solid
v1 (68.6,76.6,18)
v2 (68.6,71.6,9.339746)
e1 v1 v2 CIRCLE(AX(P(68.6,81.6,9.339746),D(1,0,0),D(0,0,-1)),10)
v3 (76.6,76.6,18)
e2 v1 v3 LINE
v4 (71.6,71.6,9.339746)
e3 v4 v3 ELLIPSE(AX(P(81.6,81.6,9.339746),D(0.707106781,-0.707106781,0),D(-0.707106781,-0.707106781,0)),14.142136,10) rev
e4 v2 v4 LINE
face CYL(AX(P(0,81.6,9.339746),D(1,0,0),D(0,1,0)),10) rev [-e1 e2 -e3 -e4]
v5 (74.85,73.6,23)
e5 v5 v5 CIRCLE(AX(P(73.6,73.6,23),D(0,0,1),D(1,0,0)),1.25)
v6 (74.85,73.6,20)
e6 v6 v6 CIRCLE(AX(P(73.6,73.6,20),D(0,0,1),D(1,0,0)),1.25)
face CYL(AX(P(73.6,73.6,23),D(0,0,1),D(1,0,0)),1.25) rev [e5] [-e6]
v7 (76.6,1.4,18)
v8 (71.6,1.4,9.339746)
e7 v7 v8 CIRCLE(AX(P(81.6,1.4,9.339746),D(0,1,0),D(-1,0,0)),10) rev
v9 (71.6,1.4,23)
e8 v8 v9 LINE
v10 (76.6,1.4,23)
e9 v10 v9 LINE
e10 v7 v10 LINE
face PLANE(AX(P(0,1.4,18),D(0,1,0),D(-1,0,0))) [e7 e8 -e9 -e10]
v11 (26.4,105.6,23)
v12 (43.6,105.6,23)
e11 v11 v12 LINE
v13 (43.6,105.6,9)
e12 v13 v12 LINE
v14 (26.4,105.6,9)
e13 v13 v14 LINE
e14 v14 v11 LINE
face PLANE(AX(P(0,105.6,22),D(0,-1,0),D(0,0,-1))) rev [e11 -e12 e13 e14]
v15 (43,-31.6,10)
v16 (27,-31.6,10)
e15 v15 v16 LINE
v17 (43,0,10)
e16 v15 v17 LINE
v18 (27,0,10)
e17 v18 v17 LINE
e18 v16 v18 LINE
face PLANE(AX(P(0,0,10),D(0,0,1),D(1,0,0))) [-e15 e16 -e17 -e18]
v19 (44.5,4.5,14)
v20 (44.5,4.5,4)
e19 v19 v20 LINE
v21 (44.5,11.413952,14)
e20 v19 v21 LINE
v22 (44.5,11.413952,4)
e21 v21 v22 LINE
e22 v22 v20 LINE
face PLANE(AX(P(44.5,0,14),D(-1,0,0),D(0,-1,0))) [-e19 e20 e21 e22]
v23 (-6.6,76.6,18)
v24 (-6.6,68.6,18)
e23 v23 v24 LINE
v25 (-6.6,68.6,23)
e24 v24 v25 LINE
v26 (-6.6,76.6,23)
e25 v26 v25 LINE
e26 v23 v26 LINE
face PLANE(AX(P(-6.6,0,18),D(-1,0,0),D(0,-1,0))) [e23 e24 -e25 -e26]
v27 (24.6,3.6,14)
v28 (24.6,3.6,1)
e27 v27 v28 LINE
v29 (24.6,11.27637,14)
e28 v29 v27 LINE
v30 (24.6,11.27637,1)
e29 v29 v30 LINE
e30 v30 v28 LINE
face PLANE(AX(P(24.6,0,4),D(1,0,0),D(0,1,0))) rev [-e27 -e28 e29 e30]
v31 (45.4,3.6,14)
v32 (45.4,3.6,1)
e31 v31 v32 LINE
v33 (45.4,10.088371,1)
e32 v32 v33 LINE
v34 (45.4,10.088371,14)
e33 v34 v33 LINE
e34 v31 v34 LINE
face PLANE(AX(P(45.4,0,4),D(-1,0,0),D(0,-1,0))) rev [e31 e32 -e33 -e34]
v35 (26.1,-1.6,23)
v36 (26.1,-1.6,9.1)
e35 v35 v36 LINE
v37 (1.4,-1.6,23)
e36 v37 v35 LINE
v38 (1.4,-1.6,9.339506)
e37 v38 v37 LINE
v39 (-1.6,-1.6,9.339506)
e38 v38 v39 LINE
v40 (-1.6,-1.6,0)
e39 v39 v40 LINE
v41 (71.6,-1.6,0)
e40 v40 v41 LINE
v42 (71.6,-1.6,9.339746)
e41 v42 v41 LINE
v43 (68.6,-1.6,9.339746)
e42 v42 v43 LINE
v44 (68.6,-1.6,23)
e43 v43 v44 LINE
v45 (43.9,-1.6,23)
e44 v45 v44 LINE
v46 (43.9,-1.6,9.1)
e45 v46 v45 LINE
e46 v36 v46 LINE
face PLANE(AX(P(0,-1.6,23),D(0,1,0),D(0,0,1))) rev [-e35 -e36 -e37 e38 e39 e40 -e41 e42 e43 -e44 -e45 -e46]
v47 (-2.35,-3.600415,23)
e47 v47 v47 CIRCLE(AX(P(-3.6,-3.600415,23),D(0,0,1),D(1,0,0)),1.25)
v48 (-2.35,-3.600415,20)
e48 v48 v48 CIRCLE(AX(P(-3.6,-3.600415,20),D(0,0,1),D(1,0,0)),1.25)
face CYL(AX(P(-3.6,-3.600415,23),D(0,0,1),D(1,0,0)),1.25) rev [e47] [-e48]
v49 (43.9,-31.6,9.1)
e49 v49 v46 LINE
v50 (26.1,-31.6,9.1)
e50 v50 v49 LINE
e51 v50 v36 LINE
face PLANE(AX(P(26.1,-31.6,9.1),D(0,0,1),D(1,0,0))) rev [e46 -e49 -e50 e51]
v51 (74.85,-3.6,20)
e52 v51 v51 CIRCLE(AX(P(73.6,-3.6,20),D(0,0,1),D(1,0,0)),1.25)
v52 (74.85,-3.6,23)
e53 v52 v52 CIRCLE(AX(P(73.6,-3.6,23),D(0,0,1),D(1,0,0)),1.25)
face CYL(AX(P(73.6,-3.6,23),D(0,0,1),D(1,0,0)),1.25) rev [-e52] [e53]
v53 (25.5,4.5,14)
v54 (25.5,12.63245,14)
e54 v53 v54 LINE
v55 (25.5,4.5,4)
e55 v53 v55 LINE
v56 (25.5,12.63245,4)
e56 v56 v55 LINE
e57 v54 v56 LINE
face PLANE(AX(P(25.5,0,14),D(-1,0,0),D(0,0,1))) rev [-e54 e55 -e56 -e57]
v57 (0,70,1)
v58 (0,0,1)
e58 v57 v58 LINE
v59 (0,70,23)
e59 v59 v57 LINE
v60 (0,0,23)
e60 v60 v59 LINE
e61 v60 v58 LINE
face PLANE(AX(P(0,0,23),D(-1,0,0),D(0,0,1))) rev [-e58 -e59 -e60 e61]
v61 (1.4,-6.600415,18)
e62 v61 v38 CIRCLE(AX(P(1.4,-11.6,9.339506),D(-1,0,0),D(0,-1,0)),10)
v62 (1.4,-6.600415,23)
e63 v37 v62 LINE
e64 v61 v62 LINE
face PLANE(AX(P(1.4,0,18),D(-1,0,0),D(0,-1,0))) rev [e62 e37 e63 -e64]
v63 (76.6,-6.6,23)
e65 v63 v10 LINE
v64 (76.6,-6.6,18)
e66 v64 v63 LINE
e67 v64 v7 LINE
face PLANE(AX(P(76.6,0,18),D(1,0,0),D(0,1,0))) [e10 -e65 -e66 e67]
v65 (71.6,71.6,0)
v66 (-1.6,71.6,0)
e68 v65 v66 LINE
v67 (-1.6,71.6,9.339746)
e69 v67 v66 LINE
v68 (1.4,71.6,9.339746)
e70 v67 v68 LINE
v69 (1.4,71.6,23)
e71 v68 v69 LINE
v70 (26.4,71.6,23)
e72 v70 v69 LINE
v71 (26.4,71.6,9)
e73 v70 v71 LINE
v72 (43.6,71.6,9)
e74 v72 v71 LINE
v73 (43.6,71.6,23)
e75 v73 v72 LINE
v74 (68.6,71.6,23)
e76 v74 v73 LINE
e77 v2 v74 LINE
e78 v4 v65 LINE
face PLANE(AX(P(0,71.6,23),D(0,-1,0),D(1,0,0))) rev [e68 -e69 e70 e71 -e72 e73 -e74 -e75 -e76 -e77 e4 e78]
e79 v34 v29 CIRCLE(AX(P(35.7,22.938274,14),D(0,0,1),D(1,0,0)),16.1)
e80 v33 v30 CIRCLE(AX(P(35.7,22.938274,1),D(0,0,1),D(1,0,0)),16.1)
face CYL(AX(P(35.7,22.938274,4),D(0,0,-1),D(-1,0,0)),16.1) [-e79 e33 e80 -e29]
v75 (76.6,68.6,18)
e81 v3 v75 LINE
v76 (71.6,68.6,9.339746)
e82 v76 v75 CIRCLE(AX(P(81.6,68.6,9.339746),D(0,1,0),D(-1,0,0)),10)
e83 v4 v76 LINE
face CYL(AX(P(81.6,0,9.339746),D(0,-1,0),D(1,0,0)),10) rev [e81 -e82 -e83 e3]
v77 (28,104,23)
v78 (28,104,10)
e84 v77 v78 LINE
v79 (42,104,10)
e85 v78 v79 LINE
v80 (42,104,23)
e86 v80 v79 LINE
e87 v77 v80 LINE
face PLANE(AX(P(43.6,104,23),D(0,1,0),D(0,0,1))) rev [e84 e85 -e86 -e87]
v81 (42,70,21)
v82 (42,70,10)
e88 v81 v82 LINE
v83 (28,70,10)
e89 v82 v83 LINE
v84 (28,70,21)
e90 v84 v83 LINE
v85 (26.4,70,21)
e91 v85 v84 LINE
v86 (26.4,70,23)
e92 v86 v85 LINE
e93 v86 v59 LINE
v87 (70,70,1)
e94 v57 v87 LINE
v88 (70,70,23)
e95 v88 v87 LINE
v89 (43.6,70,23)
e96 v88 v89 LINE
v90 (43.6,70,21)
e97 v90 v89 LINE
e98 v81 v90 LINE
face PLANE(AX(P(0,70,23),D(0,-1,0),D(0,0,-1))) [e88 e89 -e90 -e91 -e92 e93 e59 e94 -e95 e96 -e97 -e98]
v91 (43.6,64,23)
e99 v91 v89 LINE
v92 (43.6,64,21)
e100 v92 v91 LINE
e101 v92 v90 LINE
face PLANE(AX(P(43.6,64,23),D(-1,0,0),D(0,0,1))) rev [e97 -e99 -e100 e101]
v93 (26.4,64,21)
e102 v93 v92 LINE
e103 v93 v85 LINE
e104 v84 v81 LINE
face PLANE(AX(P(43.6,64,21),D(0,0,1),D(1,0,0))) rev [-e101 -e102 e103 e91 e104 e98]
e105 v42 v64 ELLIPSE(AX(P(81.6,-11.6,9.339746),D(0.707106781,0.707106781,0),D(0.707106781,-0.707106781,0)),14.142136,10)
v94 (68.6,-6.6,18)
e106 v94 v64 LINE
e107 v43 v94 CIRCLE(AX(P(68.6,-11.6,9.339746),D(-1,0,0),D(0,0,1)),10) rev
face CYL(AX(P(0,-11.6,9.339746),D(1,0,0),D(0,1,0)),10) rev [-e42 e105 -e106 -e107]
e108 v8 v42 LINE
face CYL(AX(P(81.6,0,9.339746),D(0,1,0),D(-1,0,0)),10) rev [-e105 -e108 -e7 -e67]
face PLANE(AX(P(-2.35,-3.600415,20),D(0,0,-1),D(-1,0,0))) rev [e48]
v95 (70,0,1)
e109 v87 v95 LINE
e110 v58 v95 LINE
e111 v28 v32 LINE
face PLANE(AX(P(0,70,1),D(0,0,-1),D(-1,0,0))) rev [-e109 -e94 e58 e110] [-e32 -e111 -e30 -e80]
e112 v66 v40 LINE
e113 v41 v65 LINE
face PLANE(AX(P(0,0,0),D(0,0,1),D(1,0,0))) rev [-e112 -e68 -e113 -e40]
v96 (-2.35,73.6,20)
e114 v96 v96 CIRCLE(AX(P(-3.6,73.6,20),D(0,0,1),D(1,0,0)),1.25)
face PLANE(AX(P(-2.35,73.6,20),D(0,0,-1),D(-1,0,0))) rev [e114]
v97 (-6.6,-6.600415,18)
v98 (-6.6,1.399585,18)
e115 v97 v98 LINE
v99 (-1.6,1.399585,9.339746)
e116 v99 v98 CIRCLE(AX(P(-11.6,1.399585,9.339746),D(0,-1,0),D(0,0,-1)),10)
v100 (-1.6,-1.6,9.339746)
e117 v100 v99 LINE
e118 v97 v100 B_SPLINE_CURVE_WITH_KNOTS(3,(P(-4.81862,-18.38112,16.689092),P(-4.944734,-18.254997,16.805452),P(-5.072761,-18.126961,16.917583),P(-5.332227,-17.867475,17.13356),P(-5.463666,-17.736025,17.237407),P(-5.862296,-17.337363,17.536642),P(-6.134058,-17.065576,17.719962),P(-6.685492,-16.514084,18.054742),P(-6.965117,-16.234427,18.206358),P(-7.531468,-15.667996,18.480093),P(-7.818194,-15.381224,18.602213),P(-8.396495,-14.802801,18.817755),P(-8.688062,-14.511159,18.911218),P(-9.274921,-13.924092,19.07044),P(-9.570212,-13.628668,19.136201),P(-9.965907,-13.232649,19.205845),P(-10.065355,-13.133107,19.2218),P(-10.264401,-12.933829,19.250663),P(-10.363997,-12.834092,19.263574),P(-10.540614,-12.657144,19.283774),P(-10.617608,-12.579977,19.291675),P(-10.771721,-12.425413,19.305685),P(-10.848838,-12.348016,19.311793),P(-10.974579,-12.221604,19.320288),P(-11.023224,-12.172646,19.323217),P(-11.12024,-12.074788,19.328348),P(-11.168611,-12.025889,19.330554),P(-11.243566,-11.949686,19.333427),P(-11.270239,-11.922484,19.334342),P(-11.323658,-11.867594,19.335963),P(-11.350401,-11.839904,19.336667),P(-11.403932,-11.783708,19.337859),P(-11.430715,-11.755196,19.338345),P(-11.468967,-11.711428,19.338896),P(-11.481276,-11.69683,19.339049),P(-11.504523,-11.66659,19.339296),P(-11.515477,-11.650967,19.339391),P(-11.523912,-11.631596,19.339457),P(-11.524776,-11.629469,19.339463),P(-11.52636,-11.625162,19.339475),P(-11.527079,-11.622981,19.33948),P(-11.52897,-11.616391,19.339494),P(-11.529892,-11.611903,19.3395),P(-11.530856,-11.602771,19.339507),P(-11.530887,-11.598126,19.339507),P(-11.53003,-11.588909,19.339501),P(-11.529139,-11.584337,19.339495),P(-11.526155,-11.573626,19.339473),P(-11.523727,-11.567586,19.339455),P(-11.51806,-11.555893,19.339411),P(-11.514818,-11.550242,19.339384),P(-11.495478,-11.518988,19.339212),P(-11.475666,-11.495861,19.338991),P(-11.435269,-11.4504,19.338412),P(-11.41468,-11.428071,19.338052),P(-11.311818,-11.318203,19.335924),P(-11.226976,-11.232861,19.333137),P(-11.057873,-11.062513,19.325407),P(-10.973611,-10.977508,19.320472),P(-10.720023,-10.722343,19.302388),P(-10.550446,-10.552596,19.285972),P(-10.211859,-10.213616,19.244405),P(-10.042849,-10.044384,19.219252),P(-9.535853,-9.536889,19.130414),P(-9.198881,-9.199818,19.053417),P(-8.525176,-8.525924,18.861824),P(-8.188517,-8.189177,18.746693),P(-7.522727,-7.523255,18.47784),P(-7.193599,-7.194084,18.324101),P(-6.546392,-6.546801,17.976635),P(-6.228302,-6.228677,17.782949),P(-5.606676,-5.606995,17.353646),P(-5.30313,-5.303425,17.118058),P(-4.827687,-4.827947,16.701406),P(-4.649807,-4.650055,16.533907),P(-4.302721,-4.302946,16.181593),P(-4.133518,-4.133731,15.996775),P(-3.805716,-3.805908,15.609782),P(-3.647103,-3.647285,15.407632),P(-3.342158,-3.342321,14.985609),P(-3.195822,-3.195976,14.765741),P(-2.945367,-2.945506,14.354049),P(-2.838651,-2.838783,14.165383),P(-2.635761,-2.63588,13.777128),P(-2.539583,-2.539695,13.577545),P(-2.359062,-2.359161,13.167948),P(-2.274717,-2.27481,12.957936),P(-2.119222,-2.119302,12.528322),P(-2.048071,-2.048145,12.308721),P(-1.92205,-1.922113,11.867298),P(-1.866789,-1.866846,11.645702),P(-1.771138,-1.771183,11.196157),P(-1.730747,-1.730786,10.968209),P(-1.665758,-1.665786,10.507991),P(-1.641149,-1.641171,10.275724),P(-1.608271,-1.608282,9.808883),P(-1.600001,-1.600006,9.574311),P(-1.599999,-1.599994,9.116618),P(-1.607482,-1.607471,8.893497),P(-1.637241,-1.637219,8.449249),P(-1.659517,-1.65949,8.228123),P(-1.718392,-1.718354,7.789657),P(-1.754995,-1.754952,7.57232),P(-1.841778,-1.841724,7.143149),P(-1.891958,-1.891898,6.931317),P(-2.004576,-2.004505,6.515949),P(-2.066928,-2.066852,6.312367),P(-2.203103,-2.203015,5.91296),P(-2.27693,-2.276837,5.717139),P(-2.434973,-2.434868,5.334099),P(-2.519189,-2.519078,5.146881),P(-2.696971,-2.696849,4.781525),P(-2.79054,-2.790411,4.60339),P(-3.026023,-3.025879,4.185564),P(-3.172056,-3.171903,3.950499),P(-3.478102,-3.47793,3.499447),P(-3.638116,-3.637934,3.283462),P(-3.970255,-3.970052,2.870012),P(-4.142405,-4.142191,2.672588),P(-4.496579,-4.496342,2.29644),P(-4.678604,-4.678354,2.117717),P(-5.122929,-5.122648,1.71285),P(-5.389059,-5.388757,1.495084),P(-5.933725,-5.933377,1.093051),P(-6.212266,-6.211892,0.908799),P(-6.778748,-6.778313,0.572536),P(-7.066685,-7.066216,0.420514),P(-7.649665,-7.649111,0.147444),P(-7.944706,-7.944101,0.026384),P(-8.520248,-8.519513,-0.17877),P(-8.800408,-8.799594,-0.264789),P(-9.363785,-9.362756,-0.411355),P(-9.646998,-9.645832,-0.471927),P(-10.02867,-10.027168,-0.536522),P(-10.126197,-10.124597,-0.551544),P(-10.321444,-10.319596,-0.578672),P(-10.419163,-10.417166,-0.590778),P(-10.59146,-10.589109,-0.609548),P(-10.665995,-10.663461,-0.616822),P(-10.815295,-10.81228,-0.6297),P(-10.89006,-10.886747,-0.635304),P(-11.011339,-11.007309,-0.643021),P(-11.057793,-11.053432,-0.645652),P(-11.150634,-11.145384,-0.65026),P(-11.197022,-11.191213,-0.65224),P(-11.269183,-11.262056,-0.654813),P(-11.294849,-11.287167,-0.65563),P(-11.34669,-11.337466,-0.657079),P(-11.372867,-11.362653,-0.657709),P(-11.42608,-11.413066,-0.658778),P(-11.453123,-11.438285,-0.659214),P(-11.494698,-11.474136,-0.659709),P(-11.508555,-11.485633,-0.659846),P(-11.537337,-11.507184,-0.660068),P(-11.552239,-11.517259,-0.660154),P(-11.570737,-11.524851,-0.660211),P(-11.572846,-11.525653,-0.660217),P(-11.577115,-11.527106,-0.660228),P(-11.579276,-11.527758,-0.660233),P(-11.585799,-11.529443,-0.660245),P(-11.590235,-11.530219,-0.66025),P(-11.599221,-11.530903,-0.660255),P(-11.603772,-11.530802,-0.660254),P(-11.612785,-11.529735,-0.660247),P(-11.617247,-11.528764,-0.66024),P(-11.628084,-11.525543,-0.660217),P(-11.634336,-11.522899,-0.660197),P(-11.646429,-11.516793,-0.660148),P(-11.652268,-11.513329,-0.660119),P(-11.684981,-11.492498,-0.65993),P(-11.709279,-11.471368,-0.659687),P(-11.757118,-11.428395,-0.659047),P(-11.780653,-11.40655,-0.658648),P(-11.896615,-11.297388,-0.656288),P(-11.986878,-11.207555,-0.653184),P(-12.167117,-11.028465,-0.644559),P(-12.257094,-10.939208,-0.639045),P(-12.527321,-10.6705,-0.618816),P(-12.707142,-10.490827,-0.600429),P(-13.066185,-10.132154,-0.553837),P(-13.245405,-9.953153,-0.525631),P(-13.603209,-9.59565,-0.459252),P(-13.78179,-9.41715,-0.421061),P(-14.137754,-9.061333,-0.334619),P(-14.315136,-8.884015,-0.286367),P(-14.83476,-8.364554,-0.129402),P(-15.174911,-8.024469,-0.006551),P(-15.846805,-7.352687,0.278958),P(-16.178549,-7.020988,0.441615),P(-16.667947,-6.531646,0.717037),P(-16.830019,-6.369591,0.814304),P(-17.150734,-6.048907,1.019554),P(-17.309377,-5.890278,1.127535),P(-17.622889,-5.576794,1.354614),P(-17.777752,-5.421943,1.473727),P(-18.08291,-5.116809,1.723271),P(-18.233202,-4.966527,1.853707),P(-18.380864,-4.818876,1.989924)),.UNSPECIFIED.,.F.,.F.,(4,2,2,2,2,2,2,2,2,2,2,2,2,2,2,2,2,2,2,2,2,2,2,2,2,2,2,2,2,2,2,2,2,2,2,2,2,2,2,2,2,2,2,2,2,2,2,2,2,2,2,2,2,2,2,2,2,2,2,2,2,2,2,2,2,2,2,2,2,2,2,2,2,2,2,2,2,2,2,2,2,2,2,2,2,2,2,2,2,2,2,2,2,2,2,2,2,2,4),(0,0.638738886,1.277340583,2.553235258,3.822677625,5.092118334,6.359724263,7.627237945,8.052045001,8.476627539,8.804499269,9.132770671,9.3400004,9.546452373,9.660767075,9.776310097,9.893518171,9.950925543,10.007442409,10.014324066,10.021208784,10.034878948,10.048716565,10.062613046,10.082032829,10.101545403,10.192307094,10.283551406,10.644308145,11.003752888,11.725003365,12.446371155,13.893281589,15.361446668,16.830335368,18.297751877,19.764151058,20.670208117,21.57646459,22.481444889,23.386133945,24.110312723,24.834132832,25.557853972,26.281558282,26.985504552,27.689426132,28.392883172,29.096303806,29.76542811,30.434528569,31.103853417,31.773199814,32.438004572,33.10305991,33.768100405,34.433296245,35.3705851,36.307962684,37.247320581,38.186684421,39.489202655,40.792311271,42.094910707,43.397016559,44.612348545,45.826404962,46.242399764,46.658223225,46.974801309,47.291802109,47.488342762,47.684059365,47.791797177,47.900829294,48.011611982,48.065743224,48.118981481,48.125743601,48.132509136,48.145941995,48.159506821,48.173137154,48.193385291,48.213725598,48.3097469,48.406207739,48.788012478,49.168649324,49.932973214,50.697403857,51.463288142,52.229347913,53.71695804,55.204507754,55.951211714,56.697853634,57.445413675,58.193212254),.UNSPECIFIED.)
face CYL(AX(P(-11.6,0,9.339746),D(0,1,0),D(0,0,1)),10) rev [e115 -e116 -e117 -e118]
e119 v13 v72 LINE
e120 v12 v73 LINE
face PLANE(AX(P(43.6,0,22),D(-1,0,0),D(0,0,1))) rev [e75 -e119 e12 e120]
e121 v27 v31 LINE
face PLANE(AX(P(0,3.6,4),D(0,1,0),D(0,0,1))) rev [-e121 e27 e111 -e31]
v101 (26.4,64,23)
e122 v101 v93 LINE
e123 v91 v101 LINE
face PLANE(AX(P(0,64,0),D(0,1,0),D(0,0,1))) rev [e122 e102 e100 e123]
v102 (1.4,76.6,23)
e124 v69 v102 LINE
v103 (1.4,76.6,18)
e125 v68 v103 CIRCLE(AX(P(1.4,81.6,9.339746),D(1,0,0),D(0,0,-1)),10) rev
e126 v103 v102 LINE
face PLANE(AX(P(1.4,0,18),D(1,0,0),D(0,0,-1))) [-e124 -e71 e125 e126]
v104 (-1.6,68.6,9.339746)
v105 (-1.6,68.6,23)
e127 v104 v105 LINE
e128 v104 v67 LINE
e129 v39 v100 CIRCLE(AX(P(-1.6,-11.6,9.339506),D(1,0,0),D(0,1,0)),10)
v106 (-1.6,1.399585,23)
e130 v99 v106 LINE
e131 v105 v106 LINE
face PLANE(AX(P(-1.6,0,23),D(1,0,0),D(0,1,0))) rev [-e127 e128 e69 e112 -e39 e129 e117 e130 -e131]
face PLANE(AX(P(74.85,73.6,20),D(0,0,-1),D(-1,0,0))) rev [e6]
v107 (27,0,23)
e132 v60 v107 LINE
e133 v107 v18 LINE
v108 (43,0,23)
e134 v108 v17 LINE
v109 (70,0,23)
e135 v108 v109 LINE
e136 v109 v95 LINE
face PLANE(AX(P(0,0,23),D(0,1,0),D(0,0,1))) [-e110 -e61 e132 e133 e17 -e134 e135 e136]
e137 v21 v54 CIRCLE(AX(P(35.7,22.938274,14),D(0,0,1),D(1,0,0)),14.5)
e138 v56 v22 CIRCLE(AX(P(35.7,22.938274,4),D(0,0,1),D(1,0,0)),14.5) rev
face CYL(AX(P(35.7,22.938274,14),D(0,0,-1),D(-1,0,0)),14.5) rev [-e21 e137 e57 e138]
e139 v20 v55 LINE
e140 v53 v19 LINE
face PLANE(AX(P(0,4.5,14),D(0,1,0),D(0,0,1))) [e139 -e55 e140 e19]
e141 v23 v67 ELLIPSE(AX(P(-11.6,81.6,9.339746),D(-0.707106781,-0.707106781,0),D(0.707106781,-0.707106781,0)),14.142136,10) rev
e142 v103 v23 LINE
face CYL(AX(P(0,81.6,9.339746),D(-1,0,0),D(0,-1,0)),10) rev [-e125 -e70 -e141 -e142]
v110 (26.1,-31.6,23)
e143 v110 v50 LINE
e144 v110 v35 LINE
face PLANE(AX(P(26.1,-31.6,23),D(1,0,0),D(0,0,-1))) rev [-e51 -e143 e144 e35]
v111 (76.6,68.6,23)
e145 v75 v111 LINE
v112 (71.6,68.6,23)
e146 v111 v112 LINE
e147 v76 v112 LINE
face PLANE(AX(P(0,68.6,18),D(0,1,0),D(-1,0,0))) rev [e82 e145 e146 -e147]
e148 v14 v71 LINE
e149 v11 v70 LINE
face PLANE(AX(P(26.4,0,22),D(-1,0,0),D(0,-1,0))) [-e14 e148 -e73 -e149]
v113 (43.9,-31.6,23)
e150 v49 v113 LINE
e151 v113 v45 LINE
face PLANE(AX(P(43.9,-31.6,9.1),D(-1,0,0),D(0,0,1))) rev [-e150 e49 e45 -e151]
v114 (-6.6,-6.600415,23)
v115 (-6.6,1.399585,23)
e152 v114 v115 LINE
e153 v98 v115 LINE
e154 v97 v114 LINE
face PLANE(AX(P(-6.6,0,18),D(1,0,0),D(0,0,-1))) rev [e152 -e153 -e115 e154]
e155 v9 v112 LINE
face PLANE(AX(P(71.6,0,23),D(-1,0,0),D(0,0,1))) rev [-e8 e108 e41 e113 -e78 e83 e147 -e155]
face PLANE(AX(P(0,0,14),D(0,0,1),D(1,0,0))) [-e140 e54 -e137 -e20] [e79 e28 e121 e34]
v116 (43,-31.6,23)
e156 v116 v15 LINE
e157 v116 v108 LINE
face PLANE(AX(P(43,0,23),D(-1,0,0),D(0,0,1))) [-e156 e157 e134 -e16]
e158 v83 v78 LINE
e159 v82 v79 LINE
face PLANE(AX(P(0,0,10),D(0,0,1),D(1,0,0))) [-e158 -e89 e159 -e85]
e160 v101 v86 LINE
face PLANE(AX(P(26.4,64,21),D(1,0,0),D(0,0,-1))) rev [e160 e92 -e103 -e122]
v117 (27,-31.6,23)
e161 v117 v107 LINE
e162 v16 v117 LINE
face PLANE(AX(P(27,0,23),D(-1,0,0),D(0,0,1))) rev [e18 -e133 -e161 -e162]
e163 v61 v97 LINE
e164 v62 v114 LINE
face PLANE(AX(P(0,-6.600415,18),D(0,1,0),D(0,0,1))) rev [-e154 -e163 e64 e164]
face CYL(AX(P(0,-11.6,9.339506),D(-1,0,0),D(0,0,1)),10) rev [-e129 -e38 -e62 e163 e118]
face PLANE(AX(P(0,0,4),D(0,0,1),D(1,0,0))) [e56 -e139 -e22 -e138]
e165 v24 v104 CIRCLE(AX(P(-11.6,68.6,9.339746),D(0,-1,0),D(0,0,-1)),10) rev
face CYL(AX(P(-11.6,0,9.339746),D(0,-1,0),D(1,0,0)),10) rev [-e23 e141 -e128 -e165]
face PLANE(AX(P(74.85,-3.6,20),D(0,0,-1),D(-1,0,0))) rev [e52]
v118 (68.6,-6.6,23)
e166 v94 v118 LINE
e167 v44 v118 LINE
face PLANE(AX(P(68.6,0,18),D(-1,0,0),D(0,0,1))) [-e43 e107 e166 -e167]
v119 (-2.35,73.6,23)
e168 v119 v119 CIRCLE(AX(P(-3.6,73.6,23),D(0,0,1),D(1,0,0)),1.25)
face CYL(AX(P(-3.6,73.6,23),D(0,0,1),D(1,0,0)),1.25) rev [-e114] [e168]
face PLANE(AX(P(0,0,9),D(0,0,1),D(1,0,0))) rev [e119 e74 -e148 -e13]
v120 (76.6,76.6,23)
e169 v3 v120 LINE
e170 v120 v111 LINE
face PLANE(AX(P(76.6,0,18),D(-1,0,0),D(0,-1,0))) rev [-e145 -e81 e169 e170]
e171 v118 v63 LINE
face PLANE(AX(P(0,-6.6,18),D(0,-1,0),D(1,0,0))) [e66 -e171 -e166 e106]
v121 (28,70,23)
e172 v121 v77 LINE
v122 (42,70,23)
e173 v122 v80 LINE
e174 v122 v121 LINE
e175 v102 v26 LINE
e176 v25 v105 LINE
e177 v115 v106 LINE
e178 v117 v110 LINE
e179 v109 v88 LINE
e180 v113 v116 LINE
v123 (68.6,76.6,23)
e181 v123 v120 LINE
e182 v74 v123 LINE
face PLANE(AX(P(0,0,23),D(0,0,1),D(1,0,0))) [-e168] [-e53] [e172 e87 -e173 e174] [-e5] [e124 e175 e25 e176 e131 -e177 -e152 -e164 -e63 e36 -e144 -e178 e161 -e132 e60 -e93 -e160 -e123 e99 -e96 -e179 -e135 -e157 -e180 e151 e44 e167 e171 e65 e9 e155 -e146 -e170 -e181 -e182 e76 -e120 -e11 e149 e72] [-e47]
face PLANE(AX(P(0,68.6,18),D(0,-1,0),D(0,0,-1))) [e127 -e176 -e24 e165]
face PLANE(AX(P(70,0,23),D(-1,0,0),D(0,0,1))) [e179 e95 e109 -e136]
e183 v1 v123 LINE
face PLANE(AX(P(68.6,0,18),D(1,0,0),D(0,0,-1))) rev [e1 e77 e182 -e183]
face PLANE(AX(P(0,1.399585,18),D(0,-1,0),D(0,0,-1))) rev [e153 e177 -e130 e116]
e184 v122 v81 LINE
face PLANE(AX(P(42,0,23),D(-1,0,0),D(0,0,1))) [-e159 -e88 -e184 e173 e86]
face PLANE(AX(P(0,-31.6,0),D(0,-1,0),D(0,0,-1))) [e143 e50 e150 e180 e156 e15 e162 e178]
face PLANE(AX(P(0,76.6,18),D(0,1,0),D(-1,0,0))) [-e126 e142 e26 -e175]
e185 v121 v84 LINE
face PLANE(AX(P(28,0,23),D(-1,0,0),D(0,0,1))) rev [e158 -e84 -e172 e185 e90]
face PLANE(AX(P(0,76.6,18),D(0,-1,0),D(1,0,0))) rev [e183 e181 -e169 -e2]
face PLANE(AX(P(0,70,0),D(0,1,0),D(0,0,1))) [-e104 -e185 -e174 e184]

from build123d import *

# Parameters (mm, degrees)
BOSS_EXTRUDE2_DEPTH     = 23
BOSS_EXTRUDE2_2_DEPTH   = 23
BOSS_EXTRUDE2_3_DEPTH   = 23
BOSS_EXTRUDE2_4_DEPTH   = 23
SKETCH2_W               = 70
SKETCH2_H               = 1
BOSS_EXTRUDE3_DEPTH     = 70
SKETCH1_5_W             = 14
SKETCH1_5_H             = 1.6
BOSS_EXTRUDE4_DEPTH     = 10
BOSS_EXTRUDE5_DEPTH     = 5
SKETCH5_W               = 1.6
SKETCH5_H               = 35.6
BOSS_EXTRUDE6_DEPTH     = 1
SKETCH5_5_W             = 1.6
SKETCH5_5_H             = 35.6
BOSS_EXTRUDE7_DEPTH     = 14
SKETCH6_W               = 17.2
SKETCH6_H               = 1
BOSS_EXTRUDE8_DEPTH     = 34
SKETCH7_W               = 17.2
SKETCH7_H               = 1.6
BOSS_EXTRUDE9_DEPTH     = 13
BOSS_EXTRUDE10_DEPTH    = 10
BOSS_EXTRUDE11_DEPTH    = 30
SKETCH1_12_W            = 1.6
SKETCH1_12_H            = 10
BOSS_EXTRUDE18_DEPTH    = 23
BOSS_EXTRUDE14_DEPTH    = 3
BOSS_EXTRUDE15_DEPTH    = 13
SKETCH11_W              = 17.2
SKETCH11_H              = 2
BOSS_EXTRUDE16_DEPTH    = 6
ADVANCEDHOLE1_START     = 20
ADVANCEDHOLE1_OUTLINE_R = 1.25
ADVANCEDHOLE1_DEPTH     = 3
SKETCH1_11_W            = 1.6
SKETCH1_11_H            = 10
BOSS_EXTRUDE17_DEPTH    = 23
FILLET1_R               = 10


# Read off the part's stored shape, not the designer's step: AdvancedHole1
with BuildPart() as part:
    # Sketch1 → Boss-Extrude2 (new body)
    with BuildSketch(Plane.XY):
        Polygon((27, 0), (0, 0), (0, 30), (-1.6, 30), (-1.6, -1.6), (27, -1.6), align=None)
    extrude(amount=BOSS_EXTRUDE2_DEPTH)



with BuildPart() as body_2:
    # Sketch1 → Boss-Extrude2 2 (new body)
    with BuildSketch(Plane.XY):
        Polygon((-1.6, 40), (0, 40), (0, 70), (28, 70), (28, 71.6), (-1.6, 71.6), align=None)
    extrude(amount=BOSS_EXTRUDE2_2_DEPTH)


with BuildPart() as body_3:
    # Sketch1 → Boss-Extrude2 3 (new body)
    with BuildSketch(Plane.XY):
        Polygon((70, 0), (43, 0), (43, -1.6), (71.6, -1.6), (71.6, 30), (70, 30), align=None)
    extrude(amount=BOSS_EXTRUDE2_3_DEPTH)


with BuildPart() as body_4:
    # Sketch1 → Boss-Extrude2 4 (new body)
    with BuildSketch(Plane.XY):
        Polygon((42, 71.6), (42, 70), (70, 70), (70, 40), (71.6, 40), (71.6, 71.6), align=None)
    extrude(amount=BOSS_EXTRUDE2_4_DEPTH)


with BuildPart() as part_1:
    add(part.part)

    add(body_2.part)  # Boss-Extrude3 merges body 2

    add(body_3.part)  # Boss-Extrude3 merges body 3

    add(body_4.part)  # Boss-Extrude3 merges body 4
    # Sketch2 → Boss-Extrude3 (add)
    with BuildSketch(Plane(origin=(0, 0, 0), x_dir=(1, 0, 0), z_dir=(0, 1, 0))):
        with Locations((35, -0.5)):
            Rectangle(SKETCH2_W, SKETCH2_H)
    extrude(amount=BOSS_EXTRUDE3_DEPTH)

    # Sketch1<5> → Boss-Extrude4 (add)
    with BuildSketch(Plane.XY):
        with Locations((35, 70.8)):
            Rectangle(SKETCH1_5_W, SKETCH1_5_H)
    extrude(amount=BOSS_EXTRUDE4_DEPTH)

    # Sketch4 → Boss-Extrude5 (add)
    with BuildSketch(Plane.XY.offset(23)):
        Polygon((1.4, 71.6), (1.4, 74.604290744), (-4.6, 74.604290744), (-4.6, 68.6), (-1.6, 68.6), (-1.6, 71.6), align=None)
        Polygon((-4.6, 74.604290744), (1.4, 74.604290744), (1.4, 76.6), (-6.6, 76.6), (-6.6, 68.6), (-4.6, 68.6), align=None)
        Polygon((74.608581487, 74.604290744), (68.6, 74.604290744), (68.6, 71.6), (71.6, 71.6), (71.6, 68.6), (74.608581487, 68.6), align=None)
        Polygon((68.6, 76.6), (68.6, 74.604290744), (74.608581487, 74.604290744), (74.608581487, 68.6), (76.6, 68.6), (76.6, 76.6), align=None)
        Polygon((74.608581487, -4.604290744), (74.608581487, 1.4), (71.6, 1.4), (71.6, -1.6), (68.6, -1.6), (68.6, -4.604290744), align=None)
        Polygon((76.6, 1.4), (74.608581487, 1.4), (74.608581487, -4.604290744), (68.6, -4.604290744), (68.6, -6.6), (76.6, -6.6), align=None)
        Polygon((-1.6, 1.399584801), (-4.6, 1.399584801), (-4.6, -4.604290744), (1.4, -4.604290744), (1.4, -1.6), (-1.6, -1.6), align=None)
        Polygon((-4.6, -4.604290744), (-4.6, 1.399584801), (-6.6, 1.399584801), (-6.6, -6.600415199), (1.4, -6.600415199), (1.4, -4.604290744), align=None)
    extrude(amount=-BOSS_EXTRUDE5_DEPTH)

    # Sketch5 → Boss-Extrude6 (add)
    with BuildSketch(Plane.XY.offset(23)):
        with Locations((27.2, 87.8)):
            Rectangle(SKETCH5_W, SKETCH5_H)
        with Locations((42.8, 87.8)):
            Rectangle(SKETCH5_W, SKETCH5_H)
    extrude(amount=-BOSS_EXTRUDE6_DEPTH)

    # Sketch5<5> → Boss-Extrude7 (add)
    with BuildSketch(Plane.XY.offset(23)):
        with Locations((27.2, 87.8)):
            Rectangle(SKETCH5_5_W, SKETCH5_5_H)
        with Locations((42.8, 87.8)):
            Rectangle(SKETCH5_5_W, SKETCH5_5_H)
    extrude(amount=-BOSS_EXTRUDE7_DEPTH)

    # Sketch6 → Boss-Extrude8 (add)
    with BuildSketch(Plane(origin=(0, 71.6, 0), x_dir=(1, 0, 0), z_dir=(0, 1, 0))):
        with Locations((35, -9.5)):
            Rectangle(SKETCH6_W, SKETCH6_H)
    extrude(amount=BOSS_EXTRUDE8_DEPTH)

    # Sketch7 → Boss-Extrude9 (add)
    with BuildSketch(Plane.XY.offset(10)):
        with Locations((35, 104.8)):
            Rectangle(SKETCH7_W, SKETCH7_H)
    extrude(amount=BOSS_EXTRUDE9_DEPTH)

    # Sketch1<9> → Boss-Extrude10 (add)
    with BuildSketch(Plane.XY):
        Polygon((35.002057043, 0), (27, 0), (27, -1.6), (35.00134155, -1.6), align=None)
        Polygon((43, 0), (35.002057043, 0), (35.00134155, -1.6), (43, -1.6), align=None)
    extrude(amount=BOSS_EXTRUDE10_DEPTH)

    # Sketch8 → Boss-Extrude11 (add)
    with BuildSketch(Plane.XZ.offset(1.6)):
        Polygon((27, 23), (26.1, 23), (26.1, 9.1), (43.9, 9.1), (43.9, 23), (43, 23), (43, 10), (27, 10), align=None)
    extrude(amount=BOSS_EXTRUDE11_DEPTH)

    # Sketch1<12> → Boss-Extrude18 (add)
    with BuildSketch(Plane.XY):
        Polygon((-1.6, 30), (0, 30), (0, 40), (-0.266113958, 40), (-1.6, 40), align=None)
        with Locations((70.8, 35)):
            Rectangle(SKETCH1_12_W, SKETCH1_12_H)
    extrude(amount=BOSS_EXTRUDE18_DEPTH)

    # Sketch10 → Boss-Extrude14 (add)
    with BuildSketch(Plane.XY.offset(1)):
        with BuildLine():
            Line((24.6, 3.6), (45.4, 3.6))
            Line((45.4, 3.6), (45.4, 10.08837101))
            ThreePointArc((45.4, 10.08837101), (36.618060655, 39.01207741), (24.6, 11.276369944))
            Line((24.6, 11.276369944), (24.6, 3.6))
        make_face()
    extrude(amount=BOSS_EXTRUDE14_DEPTH)

    # Sketch10<5> → Boss-Extrude15 (add)
    with BuildSketch(Plane.XY.offset(1)):
        with BuildLine():
            Line((24.6, 11.276369944), (24.6, 3.6))
            Line((24.6, 3.6), (45.4, 3.6))
            Line((45.4, 3.6), (45.4, 10.08837101))
            ThreePointArc((45.4, 10.08837101), (36.618060655, 39.01207741), (24.6, 11.276369944))
        make_face()
        with BuildLine():
            Line((44.5, 4.5), (25.5, 4.5))
            Line((25.5, 4.5), (25.5, 12.632450137))
            ThreePointArc((25.5, 12.632450137), (36.628000353, 37.40854724), (44.5, 11.413951628))
            Line((44.5, 11.413951628), (44.5, 4.5))
        make_face(mode=Mode.SUBTRACT)
    extrude(amount=BOSS_EXTRUDE15_DEPTH)

    # Sketch11 → Boss-Extrude16 (add)
    with BuildSketch(Plane.XZ.offset(-70)):
        with Locations((35, 22)):
            Rectangle(SKETCH11_W, SKETCH11_H)
    extrude(amount=BOSS_EXTRUDE16_DEPTH)

    # AdvancedHole1 outline → AdvancedHole1 (cut)
    with BuildSketch(Plane.XY.offset(ADVANCEDHOLE1_START)):
        with Locations((-3.6, -3.600415199)):
            Circle(ADVANCEDHOLE1_OUTLINE_R)
        with Locations((73.6, -3.6)):
            Circle(ADVANCEDHOLE1_OUTLINE_R)
        with Locations((-3.6, 73.6)):
            Circle(ADVANCEDHOLE1_OUTLINE_R)
        with Locations((73.6, 73.6)):
            Circle(ADVANCEDHOLE1_OUTLINE_R)
    extrude(amount=ADVANCEDHOLE1_DEPTH, mode=Mode.SUBTRACT)

    # Sketch1<11> → Boss-Extrude17 (add)
    with BuildSketch(Plane.XY):
        Polygon((-1.6, 30), (0, 30), (0, 40), (-0.266113958, 40), (-1.6, 40), align=None)
        with Locations((70.8, 35)):
            Rectangle(SKETCH1_11_W, SKETCH1_11_H)
    extrude(amount=BOSS_EXTRUDE17_DEPTH)

    # Fillet1
    # the kernel refuses this fillet: 10 mm, written as the material it adds along each edge
    with BuildSketch(Plane(origin=(1.4, -1.6, 18), x_dir=(0, 0, -1), z_dir=(-1, 0, 0))) as fillet1_piece_1:
        with BuildLine():
            CenterArc((8.66049374, 10), FILLET1_R, 209.997253102, 60.002746898)
            Line((0, 5.000415199), (-0.173209875, 4.900423503))
            ThreePointArc((-0.173209875, 4.900423503), (-0.2, 2.5002076), (-0.2, 0))
            Line((-0.2, 0), (0, -0.2))
            Line((0, -0.2), (8.66049374, -0.2))
            Line((8.66049374, -0.2), (8.66049374, 0))
        make_face()
    extrude(amount=3)
    with BuildSketch(Plane(origin=(-1.6, -1.6, 18), x_dir=(0, 0, -1), z_dir=(0, 1, 0))) as fillet1_piece_2:
        with BuildLine():
            CenterArc((8.660254038, 10), FILLET1_R, 210, 60)
            Line((0, 5), (-0.173205081, 4.9))
            ThreePointArc((-0.173205081, 4.9), (-0.2, 2.5), (-0.2, 0))
            Line((-0.2, 0), (0, -0.2))
            Line((0, -0.2), (8.660254038, -0.2))
            Line((8.660254038, -0.2), (8.660254038, 0))
        make_face()
    extrude(amount=2.999584801)
    with BuildSketch(Plane(origin=(71.6, -1.6, 18), x_dir=(0, 0, -1), z_dir=(-1, 0, 0)), Plane(origin=(68.6, 71.6, 18), x_dir=(0, 0, -1), z_dir=(1, 0, 0)), Plane(origin=(-1.6, 68.6, 18), x_dir=(0, 0, -1), z_dir=(0, 1, 0))) as fillet1_piece_3:
        with BuildLine():
            CenterArc((8.660254038, 10), FILLET1_R, 210, 60)
            Line((0, 5), (-0.173205081, 4.9))
            ThreePointArc((-0.173205081, 4.9), (-0.2, 2.5), (-0.2, 0))
            Line((-0.2, 0), (0, -0.2))
            Line((0, -0.2), (8.660254038, -0.2))
            Line((8.660254038, -0.2), (8.660254038, 0))
        make_face()
    extrude(amount=3)
    with BuildSketch(Plane(origin=(71.6, 1.4, 18), x_dir=(1, 0, 0), z_dir=(0, -1, 0)), Plane(origin=(71.6, 71.6, 18), x_dir=(1, 0, 0), z_dir=(0, -1, 0)), Plane(origin=(-1.6, 71.6, 18), x_dir=(0, 1, 0), z_dir=(1, 0, 0))) as fillet1_piece_4:
        with BuildLine():
            CenterArc((10, -8.660254038), FILLET1_R, 120, 60)
            Line((0, -8.660254038), (-0.2, -8.660254038))
            Line((-0.2, -8.660254038), (-0.2, 0))
            Line((-0.2, 0), (0, 0.2))
            ThreePointArc((0, 0.2), (2.5, 0.2), (4.9, 0.173205081))
            Line((4.9, 0.173205081), (5, 0))
        make_face()
    extrude(amount=3)
    with BuildSketch(Plane(origin=(1.4, -1.6, 18), x_dir=(0, 0, -1), z_dir=(-1, 0, 0))) as fillet1_piece_5a_section:
        with BuildLine():
            CenterArc((8.66049374, 10), FILLET1_R, 209.997253102, 60.002746898)
            Line((0, 5.000415199), (-0.173209875, 4.900423503))
            ThreePointArc((-0.173209875, 4.900423503), (-0.2, 2.5002076), (-0.2, 0))
            Line((-0.2, 0), (0, -0.2))
            Line((0, -0.2), (8.66049374, -0.2))
            Line((8.66049374, -0.2), (8.66049374, 0))
        make_face()
    fillet1_piece_5a = extrude(amount=24.65123435, mode=Mode.PRIVATE)
    fillet1_piece_5a = split(fillet1_piece_5a, bisect_by=Plane(origin=(-1.6, -2.895276984, 15.83686011), z_dir=(-1, 0, 0)), keep=Keep.TOP, mode=Mode.PRIVATE)
    fillet1_piece_5a = split(fillet1_piece_5a, bisect_by=Plane(origin=(-6.6, -2.895276984, 15.83686011), z_dir=(1, 0, 0)), keep=Keep.TOP, mode=Mode.PRIVATE)
    with BuildSketch(Plane(origin=(-1.6, -23.250635095, 18), x_dir=(0, 0, -1), z_dir=(0, 1, 0))) as fillet1_piece_5b_section:
        with BuildLine():
            CenterArc((8.660254038, 10), FILLET1_R, 210, 60)
            Line((0, 5), (-0.173205081, 4.9))
            ThreePointArc((-0.173205081, 4.9), (-0.2, 2.5), (-0.2, 0))
            Line((-0.2, 0), (0, -0.2))
            Line((0, -0.2), (8.660254038, -0.2))
            Line((8.660254038, -0.2), (8.660254038, 0))
        make_face()
    fillet1_piece_5b = extrude(amount=24.650219895, mode=Mode.PRIVATE)
    fillet1_piece_5b = split(fillet1_piece_5b, bisect_by=Plane(origin=(-2.895167111, -1.6, 15.836895542), z_dir=(0, -1, 0)), keep=Keep.TOP, mode=Mode.PRIVATE)
    fillet1_piece_5b = split(fillet1_piece_5b, bisect_by=Plane(origin=(-2.895167111, -6.600415199, 15.836895542), z_dir=(0, 1, 0)), keep=Keep.TOP, mode=Mode.PRIVATE)
    fillet1_piece_5 = fillet1_piece_5a & fillet1_piece_5b
    add(fillet1_piece_5)
    with BuildSketch(Plane(origin=(93.250635095, -1.6, 18), x_dir=(0, 0, -1), z_dir=(-1, 0, 0))) as fillet1_piece_6a_section:
        with BuildLine():
            CenterArc((8.660254038, 10), FILLET1_R, 210, 60)
            Line((0, 5), (-0.173205081, 4.9))
            ThreePointArc((-0.173205081, 4.9), (-0.2, 2.5), (-0.2, 0))
            Line((-0.2, 0), (0, -0.2))
            Line((0, -0.2), (8.660254038, -0.2))
            Line((8.660254038, -0.2), (8.660254038, 0))
        make_face()
    fillet1_piece_6a = extrude(amount=24.650635095, mode=Mode.PRIVATE)
    fillet1_piece_6a = split(fillet1_piece_6a, bisect_by=Plane(origin=(71.6, -2.895167111, 15.836895542), z_dir=(1, 0, 0)), keep=Keep.TOP, mode=Mode.PRIVATE)
    fillet1_piece_6a = split(fillet1_piece_6a, bisect_by=Plane(origin=(76.6, -2.895167111, 15.836895542), z_dir=(-1, 0, 0)), keep=Keep.TOP, mode=Mode.PRIVATE)
    with BuildSketch(Plane(origin=(71.6, 1.4, 18), x_dir=(1, 0, 0), z_dir=(0, -1, 0))) as fillet1_piece_6b_section:
        with BuildLine():
            CenterArc((10, -8.660254038), FILLET1_R, 120, 60)
            Line((0, -8.660254038), (-0.2, -8.660254038))
            Line((-0.2, -8.660254038), (-0.2, 0))
            Line((-0.2, 0), (0, 0.2))
            ThreePointArc((0, 0.2), (2.5, 0.2), (4.9, 0.173205081))
            Line((4.9, 0.173205081), (5, 0))
        make_face()
    fillet1_piece_6b = extrude(amount=24.650635095, mode=Mode.PRIVATE)
    fillet1_piece_6b = split(fillet1_piece_6b, bisect_by=Plane(origin=(72.895167111, -1.6, 15.836895542), z_dir=(0, -1, 0)), keep=Keep.TOP, mode=Mode.PRIVATE)
    fillet1_piece_6b = split(fillet1_piece_6b, bisect_by=Plane(origin=(72.895167111, -6.6, 15.836895542), z_dir=(0, 1, 0)), keep=Keep.TOP, mode=Mode.PRIVATE)
    fillet1_piece_6 = fillet1_piece_6a & fillet1_piece_6b
    add(fillet1_piece_6)
    with BuildSketch(Plane(origin=(68.6, 71.6, 18), x_dir=(0, 0, -1), z_dir=(1, 0, 0))) as fillet1_piece_7a_section:
        with BuildLine():
            CenterArc((8.660254038, 10), FILLET1_R, 210, 60)
            Line((0, 5), (-0.173205081, 4.9))
            ThreePointArc((-0.173205081, 4.9), (-0.2, 2.5), (-0.2, 0))
            Line((-0.2, 0), (0, -0.2))
            Line((0, -0.2), (8.660254038, -0.2))
            Line((8.660254038, -0.2), (8.660254038, 0))
        make_face()
    fillet1_piece_7a = extrude(amount=24.650635095, mode=Mode.PRIVATE)
    fillet1_piece_7a = split(fillet1_piece_7a, bisect_by=Plane(origin=(71.6, 72.895167111, 15.836895542), z_dir=(1, 0, 0)), keep=Keep.TOP, mode=Mode.PRIVATE)
    fillet1_piece_7a = split(fillet1_piece_7a, bisect_by=Plane(origin=(76.6, 72.895167111, 15.836895542), z_dir=(-1, 0, 0)), keep=Keep.TOP, mode=Mode.PRIVATE)
    with BuildSketch(Plane(origin=(71.6, 93.250635095, 18), x_dir=(1, 0, 0), z_dir=(0, -1, 0))) as fillet1_piece_7b_section:
        with BuildLine():
            CenterArc((10, -8.660254038), FILLET1_R, 120, 60)
            Line((0, -8.660254038), (-0.2, -8.660254038))
            Line((-0.2, -8.660254038), (-0.2, 0))
            Line((-0.2, 0), (0, 0.2))
            ThreePointArc((0, 0.2), (2.5, 0.2), (4.9, 0.173205081))
            Line((4.9, 0.173205081), (5, 0))
        make_face()
    fillet1_piece_7b = extrude(amount=24.650635095, mode=Mode.PRIVATE)
    fillet1_piece_7b = split(fillet1_piece_7b, bisect_by=Plane(origin=(72.895167111, 71.6, 15.836895542), z_dir=(0, 1, 0)), keep=Keep.TOP, mode=Mode.PRIVATE)
    fillet1_piece_7b = split(fillet1_piece_7b, bisect_by=Plane(origin=(72.895167111, 76.6, 15.836895542), z_dir=(0, -1, 0)), keep=Keep.TOP, mode=Mode.PRIVATE)
    fillet1_piece_7 = fillet1_piece_7a & fillet1_piece_7b
    add(fillet1_piece_7)
    with BuildSketch(Plane(origin=(-1.6, 68.6, 18), x_dir=(0, 0, -1), z_dir=(0, 1, 0))) as fillet1_piece_8a_section:
        with BuildLine():
            CenterArc((8.660254038, 10), FILLET1_R, 210, 60)
            Line((0, 5), (-0.173205081, 4.9))
            ThreePointArc((-0.173205081, 4.9), (-0.2, 2.5), (-0.2, 0))
            Line((-0.2, 0), (0, -0.2))
            Line((0, -0.2), (8.660254038, -0.2))
            Line((8.660254038, -0.2), (8.660254038, 0))
        make_face()
    fillet1_piece_8a = extrude(amount=24.650635095, mode=Mode.PRIVATE)
    fillet1_piece_8a = split(fillet1_piece_8a, bisect_by=Plane(origin=(-2.895167111, 71.6, 15.836895542), z_dir=(0, 1, 0)), keep=Keep.TOP, mode=Mode.PRIVATE)
    fillet1_piece_8a = split(fillet1_piece_8a, bisect_by=Plane(origin=(-2.895167111, 76.6, 15.836895542), z_dir=(0, -1, 0)), keep=Keep.TOP, mode=Mode.PRIVATE)
    with BuildSketch(Plane(origin=(-23.250635095, 71.6, 18), x_dir=(0, 1, 0), z_dir=(1, 0, 0))) as fillet1_piece_8b_section:
        with BuildLine():
            CenterArc((10, -8.660254038), FILLET1_R, 120, 60)
            Line((0, -8.660254038), (-0.2, -8.660254038))
            Line((-0.2, -8.660254038), (-0.2, 0))
            Line((-0.2, 0), (0, 0.2))
            ThreePointArc((0, 0.2), (2.5, 0.2), (4.9, 0.173205081))
            Line((4.9, 0.173205081), (5, 0))
        make_face()
    fillet1_piece_8b = extrude(amount=24.650635095, mode=Mode.PRIVATE)
    fillet1_piece_8b = split(fillet1_piece_8b, bisect_by=Plane(origin=(-1.6, 72.895167111, 15.836895542), z_dir=(-1, 0, 0)), keep=Keep.TOP, mode=Mode.PRIVATE)
    fillet1_piece_8b = split(fillet1_piece_8b, bisect_by=Plane(origin=(-6.6, 72.895167111, 15.836895542), z_dir=(1, 0, 0)), keep=Keep.TOP, mode=Mode.PRIVATE)
    fillet1_piece_8 = fillet1_piece_8a & fillet1_piece_8b
    add(fillet1_piece_8)


solid = part_1.part
